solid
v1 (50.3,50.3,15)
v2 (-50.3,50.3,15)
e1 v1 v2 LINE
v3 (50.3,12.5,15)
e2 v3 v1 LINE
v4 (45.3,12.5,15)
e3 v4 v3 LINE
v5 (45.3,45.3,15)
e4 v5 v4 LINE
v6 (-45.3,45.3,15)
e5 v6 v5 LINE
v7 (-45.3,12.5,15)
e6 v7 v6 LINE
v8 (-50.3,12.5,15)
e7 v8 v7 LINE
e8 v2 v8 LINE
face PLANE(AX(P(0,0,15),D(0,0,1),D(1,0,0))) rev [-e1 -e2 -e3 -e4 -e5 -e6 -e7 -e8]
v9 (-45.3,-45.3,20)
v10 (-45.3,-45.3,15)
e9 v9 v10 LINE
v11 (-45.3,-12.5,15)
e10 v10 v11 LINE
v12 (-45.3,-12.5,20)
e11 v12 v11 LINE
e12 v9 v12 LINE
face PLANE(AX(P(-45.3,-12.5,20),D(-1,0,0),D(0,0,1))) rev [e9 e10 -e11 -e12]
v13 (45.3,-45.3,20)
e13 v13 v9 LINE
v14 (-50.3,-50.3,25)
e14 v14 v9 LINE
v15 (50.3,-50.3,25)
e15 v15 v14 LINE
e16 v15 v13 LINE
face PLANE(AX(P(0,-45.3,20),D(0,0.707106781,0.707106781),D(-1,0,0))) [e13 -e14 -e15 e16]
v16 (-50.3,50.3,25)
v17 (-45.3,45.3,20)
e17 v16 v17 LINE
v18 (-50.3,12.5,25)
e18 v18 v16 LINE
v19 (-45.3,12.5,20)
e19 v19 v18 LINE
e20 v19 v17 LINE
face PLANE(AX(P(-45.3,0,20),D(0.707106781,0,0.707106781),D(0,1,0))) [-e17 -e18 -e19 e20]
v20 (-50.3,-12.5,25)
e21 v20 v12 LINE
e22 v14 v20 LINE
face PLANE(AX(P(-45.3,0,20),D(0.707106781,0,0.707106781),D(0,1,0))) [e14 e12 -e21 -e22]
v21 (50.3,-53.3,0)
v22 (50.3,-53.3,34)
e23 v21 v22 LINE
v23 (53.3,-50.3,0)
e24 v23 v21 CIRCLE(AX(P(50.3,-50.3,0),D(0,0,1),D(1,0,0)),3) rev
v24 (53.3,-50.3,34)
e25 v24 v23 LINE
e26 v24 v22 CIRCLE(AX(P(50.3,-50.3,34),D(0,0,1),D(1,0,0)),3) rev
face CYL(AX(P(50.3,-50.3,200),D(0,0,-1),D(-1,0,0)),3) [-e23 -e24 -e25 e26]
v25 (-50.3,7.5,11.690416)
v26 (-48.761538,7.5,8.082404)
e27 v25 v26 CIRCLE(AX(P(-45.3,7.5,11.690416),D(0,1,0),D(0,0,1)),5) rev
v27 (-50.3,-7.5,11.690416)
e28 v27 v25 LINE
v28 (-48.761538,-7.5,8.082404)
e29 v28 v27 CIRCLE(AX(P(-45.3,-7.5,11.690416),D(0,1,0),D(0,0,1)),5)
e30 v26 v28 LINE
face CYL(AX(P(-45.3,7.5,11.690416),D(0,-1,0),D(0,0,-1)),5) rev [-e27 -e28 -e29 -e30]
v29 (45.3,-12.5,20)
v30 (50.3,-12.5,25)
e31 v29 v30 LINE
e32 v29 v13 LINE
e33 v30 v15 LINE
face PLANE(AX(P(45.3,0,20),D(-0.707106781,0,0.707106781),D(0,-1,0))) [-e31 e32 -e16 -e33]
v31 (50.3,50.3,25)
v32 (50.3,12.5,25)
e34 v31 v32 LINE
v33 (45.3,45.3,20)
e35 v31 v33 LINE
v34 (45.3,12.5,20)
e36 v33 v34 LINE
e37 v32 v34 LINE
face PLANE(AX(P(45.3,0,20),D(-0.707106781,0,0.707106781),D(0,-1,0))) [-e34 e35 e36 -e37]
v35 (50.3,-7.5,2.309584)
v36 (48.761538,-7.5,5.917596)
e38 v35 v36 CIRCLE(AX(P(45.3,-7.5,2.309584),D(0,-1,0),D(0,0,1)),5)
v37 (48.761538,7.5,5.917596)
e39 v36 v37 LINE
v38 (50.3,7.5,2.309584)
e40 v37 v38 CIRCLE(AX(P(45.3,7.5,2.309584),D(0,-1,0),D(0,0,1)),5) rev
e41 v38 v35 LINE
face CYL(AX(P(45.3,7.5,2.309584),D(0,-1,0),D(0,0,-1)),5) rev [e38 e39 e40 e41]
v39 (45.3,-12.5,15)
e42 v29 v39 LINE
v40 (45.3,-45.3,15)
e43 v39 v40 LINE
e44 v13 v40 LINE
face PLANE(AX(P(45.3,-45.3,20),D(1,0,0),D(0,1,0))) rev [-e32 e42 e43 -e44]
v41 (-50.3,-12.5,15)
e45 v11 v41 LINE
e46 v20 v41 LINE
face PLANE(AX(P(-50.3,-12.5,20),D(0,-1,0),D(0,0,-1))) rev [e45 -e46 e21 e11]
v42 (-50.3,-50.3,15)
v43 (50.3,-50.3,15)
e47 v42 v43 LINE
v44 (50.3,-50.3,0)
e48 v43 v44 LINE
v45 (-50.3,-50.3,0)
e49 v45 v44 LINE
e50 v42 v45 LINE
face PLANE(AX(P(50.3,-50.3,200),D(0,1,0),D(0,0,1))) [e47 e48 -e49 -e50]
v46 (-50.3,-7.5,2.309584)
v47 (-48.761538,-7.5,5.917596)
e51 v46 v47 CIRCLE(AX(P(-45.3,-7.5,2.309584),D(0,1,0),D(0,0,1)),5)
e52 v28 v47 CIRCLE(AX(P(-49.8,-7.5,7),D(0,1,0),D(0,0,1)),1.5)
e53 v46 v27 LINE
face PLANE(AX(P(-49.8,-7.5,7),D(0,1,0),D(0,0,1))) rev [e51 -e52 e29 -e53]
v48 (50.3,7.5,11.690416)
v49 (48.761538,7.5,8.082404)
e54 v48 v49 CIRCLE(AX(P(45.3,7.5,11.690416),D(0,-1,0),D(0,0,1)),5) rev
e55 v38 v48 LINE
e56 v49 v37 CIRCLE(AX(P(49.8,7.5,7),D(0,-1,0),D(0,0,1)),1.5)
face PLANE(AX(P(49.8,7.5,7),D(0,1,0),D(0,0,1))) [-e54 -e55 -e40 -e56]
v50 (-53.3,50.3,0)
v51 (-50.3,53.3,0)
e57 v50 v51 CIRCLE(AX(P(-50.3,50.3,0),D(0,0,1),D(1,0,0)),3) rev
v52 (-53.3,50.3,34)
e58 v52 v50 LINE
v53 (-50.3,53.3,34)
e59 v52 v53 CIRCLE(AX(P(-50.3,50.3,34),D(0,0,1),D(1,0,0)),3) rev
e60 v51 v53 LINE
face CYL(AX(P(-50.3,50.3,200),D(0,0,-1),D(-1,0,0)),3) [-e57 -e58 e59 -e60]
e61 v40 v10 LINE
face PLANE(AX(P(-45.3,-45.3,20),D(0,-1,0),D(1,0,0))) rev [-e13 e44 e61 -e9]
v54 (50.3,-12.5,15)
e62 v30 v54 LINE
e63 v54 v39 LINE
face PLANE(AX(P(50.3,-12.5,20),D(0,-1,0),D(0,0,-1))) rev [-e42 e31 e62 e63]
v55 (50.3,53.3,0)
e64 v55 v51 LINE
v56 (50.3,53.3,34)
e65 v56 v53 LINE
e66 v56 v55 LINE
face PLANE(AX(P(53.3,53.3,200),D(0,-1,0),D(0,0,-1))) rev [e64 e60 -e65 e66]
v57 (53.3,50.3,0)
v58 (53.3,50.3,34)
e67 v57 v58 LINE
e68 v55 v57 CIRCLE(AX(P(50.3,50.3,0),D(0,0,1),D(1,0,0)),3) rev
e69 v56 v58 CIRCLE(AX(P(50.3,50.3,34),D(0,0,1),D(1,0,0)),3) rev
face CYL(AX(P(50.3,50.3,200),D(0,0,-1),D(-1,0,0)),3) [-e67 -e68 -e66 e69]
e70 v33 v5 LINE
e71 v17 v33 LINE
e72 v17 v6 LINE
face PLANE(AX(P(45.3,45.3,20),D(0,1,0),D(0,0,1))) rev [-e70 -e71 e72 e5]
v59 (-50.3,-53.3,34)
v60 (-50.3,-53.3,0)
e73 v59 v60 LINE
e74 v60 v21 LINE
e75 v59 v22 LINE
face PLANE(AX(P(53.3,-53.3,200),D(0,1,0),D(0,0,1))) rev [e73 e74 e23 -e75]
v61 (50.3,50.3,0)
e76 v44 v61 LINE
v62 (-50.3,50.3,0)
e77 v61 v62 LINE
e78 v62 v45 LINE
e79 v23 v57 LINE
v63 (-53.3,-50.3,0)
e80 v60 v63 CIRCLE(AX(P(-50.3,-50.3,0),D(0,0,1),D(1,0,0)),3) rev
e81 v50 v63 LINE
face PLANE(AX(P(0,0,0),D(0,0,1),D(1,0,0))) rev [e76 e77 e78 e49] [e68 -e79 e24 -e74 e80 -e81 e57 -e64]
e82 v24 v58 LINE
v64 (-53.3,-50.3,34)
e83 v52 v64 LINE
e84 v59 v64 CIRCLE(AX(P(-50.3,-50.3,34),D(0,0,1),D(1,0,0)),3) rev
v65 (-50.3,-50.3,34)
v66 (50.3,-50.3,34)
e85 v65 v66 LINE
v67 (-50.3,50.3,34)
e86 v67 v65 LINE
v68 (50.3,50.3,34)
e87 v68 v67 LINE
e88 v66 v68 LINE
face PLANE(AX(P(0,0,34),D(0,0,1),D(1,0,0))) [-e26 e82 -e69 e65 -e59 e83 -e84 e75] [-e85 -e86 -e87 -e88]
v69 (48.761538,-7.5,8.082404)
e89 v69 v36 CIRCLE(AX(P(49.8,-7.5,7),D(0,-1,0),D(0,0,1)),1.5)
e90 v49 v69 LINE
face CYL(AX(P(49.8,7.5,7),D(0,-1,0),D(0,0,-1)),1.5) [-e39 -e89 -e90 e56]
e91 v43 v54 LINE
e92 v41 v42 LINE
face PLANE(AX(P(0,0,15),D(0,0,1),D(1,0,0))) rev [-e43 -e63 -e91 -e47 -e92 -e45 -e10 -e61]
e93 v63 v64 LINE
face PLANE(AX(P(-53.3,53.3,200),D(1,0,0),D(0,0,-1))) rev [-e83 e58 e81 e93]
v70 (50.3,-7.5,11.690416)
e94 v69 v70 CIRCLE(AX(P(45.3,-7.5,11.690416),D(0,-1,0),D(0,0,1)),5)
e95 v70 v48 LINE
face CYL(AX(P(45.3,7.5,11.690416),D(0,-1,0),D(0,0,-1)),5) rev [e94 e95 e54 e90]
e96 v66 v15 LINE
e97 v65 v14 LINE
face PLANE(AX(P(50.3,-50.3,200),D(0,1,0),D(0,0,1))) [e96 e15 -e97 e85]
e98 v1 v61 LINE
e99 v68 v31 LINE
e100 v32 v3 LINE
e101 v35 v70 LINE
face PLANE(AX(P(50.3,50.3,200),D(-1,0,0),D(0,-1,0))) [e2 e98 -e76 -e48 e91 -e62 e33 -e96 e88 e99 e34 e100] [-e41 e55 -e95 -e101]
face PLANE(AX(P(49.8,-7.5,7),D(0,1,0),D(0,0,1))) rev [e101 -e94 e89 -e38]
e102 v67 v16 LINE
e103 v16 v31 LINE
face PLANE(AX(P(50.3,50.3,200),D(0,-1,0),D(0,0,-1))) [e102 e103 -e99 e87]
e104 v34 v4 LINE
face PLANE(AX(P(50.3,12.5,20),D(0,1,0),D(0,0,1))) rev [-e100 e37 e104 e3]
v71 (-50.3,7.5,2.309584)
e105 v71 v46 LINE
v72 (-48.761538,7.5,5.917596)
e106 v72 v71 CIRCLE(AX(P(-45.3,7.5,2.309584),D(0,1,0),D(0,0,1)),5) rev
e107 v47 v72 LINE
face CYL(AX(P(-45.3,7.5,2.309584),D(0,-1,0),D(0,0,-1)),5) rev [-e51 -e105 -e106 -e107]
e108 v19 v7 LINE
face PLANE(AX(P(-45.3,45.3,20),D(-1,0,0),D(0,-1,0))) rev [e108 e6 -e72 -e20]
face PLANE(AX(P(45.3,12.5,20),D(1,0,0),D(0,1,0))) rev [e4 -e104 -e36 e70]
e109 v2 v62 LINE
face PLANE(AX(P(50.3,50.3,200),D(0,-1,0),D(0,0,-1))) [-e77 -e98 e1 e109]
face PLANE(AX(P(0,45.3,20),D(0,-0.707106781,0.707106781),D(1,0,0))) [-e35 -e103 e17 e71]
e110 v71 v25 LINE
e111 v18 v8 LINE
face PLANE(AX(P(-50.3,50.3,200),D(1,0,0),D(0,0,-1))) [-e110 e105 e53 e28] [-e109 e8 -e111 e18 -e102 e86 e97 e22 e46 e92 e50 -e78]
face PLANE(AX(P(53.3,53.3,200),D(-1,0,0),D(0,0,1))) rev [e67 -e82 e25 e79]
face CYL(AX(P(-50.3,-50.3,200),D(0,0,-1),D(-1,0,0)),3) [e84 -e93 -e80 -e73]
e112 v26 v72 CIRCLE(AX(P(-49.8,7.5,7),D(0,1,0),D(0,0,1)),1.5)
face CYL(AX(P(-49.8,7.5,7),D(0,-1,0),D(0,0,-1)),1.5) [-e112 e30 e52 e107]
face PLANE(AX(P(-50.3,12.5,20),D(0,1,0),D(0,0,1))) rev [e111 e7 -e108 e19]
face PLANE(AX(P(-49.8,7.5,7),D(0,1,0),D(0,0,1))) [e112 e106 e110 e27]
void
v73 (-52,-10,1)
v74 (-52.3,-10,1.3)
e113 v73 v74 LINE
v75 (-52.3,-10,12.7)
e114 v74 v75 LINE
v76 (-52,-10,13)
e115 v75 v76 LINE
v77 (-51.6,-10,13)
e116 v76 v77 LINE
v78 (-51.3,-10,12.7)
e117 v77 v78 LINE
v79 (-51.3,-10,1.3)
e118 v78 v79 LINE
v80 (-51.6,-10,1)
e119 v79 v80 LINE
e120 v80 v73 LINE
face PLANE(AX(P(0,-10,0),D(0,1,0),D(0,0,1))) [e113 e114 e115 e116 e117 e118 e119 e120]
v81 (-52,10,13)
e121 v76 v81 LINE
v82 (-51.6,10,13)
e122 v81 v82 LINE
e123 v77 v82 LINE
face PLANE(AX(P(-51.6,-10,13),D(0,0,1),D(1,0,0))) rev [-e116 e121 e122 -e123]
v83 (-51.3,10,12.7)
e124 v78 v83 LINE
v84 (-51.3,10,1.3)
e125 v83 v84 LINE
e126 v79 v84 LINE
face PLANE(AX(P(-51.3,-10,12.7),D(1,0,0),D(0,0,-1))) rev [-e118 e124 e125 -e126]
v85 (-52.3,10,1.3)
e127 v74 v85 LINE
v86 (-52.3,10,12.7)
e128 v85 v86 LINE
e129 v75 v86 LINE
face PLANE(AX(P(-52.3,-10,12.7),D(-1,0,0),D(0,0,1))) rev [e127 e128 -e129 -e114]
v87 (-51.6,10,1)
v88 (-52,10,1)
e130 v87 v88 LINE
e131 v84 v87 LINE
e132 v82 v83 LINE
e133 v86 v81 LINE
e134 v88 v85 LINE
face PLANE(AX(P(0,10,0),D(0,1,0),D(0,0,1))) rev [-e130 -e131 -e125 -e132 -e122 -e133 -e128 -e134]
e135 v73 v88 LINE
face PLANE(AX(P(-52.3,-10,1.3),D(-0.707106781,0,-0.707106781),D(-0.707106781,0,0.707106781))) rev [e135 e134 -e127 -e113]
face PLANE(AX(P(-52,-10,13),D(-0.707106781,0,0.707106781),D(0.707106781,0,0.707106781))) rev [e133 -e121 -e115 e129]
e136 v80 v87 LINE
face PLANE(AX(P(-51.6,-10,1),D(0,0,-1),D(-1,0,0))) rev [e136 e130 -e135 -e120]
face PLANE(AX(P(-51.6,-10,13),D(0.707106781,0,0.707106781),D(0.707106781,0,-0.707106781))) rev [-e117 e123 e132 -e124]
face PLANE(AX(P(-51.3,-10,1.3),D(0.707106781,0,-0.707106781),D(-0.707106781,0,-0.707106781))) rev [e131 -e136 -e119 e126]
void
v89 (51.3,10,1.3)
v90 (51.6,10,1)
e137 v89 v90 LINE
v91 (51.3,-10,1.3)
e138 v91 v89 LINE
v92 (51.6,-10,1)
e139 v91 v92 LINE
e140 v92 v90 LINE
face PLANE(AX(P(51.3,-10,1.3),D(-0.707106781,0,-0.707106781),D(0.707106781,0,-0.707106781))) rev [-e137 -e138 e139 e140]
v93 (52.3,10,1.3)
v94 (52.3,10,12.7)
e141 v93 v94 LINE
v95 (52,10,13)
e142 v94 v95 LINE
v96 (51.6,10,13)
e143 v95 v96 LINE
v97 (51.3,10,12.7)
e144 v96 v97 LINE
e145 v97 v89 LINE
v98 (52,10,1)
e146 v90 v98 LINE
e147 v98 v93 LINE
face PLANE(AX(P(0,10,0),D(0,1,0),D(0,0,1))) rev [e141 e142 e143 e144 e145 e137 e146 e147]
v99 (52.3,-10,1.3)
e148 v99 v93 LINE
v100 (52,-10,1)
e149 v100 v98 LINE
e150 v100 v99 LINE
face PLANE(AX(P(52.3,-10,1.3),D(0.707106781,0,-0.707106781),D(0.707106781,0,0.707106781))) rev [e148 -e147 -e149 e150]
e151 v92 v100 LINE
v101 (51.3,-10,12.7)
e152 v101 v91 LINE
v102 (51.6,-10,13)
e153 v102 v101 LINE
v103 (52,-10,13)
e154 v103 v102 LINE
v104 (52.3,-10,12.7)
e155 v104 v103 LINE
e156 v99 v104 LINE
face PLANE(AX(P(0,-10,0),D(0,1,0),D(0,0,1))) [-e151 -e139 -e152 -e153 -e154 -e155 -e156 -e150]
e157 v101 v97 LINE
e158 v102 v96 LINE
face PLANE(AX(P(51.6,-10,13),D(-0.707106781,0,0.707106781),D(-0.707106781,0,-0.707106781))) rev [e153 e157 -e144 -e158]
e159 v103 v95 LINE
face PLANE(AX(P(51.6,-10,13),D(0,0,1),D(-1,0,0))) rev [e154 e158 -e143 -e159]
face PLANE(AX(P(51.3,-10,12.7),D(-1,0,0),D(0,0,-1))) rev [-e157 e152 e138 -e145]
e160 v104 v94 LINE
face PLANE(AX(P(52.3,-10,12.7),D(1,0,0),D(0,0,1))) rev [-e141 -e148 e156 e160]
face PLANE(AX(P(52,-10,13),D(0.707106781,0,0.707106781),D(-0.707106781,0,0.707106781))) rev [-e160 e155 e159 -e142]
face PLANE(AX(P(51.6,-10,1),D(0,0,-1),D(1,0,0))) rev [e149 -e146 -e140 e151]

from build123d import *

# Parameters (mm, degrees)
SKETCH1_W            = 106.6
SKETCH1_H            = 106.6
SKETCH1_W_2          = 100.6
SKETCH1_H_2          = 100.6
BOSS_EXTRUDE1_DEPTH  = 200
SKETCH2_W            = 75
SKETCH2_H            = 10
CUT_EXTRUDE1_DEPTH   = 214.732964233
CIRPATTERN1_COUNT    = 2
CIRPATTERN1_ANGLE    = 90
FILLET1_R            = 3
BOSS_EXTRUDE2_DEPTH  = 5
SKETCH4_R            = 1.5
BOSS_EXTRUDE3_DEPTH  = 7.5
CUT_EXTRUDE3_DEPTH   = 10
FILLET2_R            = 5
FILLET2_OF_MIRROR3_R = 5
CHAMFER1_SIZE        = 5
SKETCH7_W            = 168.98996808
SKETCH7_H            = 119.087176344
TEST_PIECE_DEPTH     = 166


with BuildPart() as part:
    # Sketch1 → Boss-Extrude1 (new body)
    with BuildSketch(Plane(origin=(0, 0, 0), x_dir=(0, 1, 0), z_dir=(0, 0, 1))):
        Rectangle(SKETCH1_W, SKETCH1_H)
        Rectangle(SKETCH1_W_2, SKETCH1_H_2, mode=Mode.SUBTRACT)
    extrude(amount=BOSS_EXTRUDE1_DEPTH)

    # Sketch2 → Cut-Extrude1 (cut, symmetric)
    with BuildSketch(Plane.YZ):
        with Locations((0, 187.5)):
            Rectangle(SKETCH2_W, SKETCH2_H)
        with Locations((0, 172.5)):
            Rectangle(SKETCH2_W, SKETCH2_H)
        with Locations((0, 157.5)):
            Rectangle(SKETCH2_W, SKETCH2_H)
    cut_extrude1 = extrude(amount=CUT_EXTRUDE1_DEPTH, both=True, mode=Mode.SUBTRACT)

    # CirPattern1: Cut-Extrude1 ×2 about axis
    cirpattern1_axis = Axis((0, 0, 210), (0, 0, -1))
    for i in range(1, CIRPATTERN1_COUNT):
        add(cut_extrude1.rotate(cirpattern1_axis, i * CIRPATTERN1_ANGLE / (CIRPATTERN1_COUNT - 1)), mode=Mode.SUBTRACT)

    # Fillet1
    fillet1_edges = [part.edges().sort_by_distance(p)[0] for p in [
        (-53.3, -53.3, 100),
        (-53.3, 53.3, 100),
        (53.3, 53.3, 100),
        (53.3, -53.3, 100),
    ]]
    fillet(fillet1_edges, radius=FILLET1_R)

    # Sketch3 → Boss-Extrude2 (add)
    with BuildSketch(Plane(origin=(0, 0, 15), x_dir=(0, 1, 0), z_dir=(0, 0, 1))):
        Polygon((-50.3, -50.3), (-12.5, -50.3), (-12.5, -45.3), (-45.3, -45.3), (-45.3, 45.3), (-12.5, 45.3), (-12.5, 50.3), (-50.3, 50.3), align=None)
        Polygon((50.3, -50.3), (50.3, 50.3), (12.5, 50.3), (12.5, 45.3), (45.3, 45.3), (45.3, -45.3), (12.5, -45.3), (12.5, -50.3), align=None)
    extrude(amount=BOSS_EXTRUDE2_DEPTH)

    # Sketch4 → Boss-Extrude3 (add, symmetric)
    with BuildSketch(Plane(origin=(0, 0, 0), x_dir=(-1, 0, 0), z_dir=(0, 1, 0))):
        with Locations((49.8, 7)):
            Circle(SKETCH4_R)
    boss_extrude3 = extrude(amount=BOSS_EXTRUDE3_DEPTH, both=True)

    # Sketch6 → Cut-Extrude3 (cut, symmetric)
    with BuildSketch(Plane(origin=(0, 0, 0), x_dir=(-1, 0, 0), z_dir=(0, 1, 0))):
        Polygon((51.6, 13), (52, 13), (52.3, 12.7), (52.3, 1.3), (52, 1), (51.6, 1), (51.3, 1.3), (51.3, 12.7), align=None)
    cut_extrude3 = extrude(amount=CUT_EXTRUDE3_DEPTH, both=True, mode=Mode.SUBTRACT)

    # Fillet2
    fillet2_edges = [part.edges().sort_by_distance(p)[0] for p in [
        (-50.3, 0, 5.585786438),
        (-50.3, 0, 8.414213562),
    ]]
    fillet(fillet2_edges, radius=FILLET2_R)

    # Mirror3: Boss-Extrude3, Cut-Extrude3 across plane
    add(boss_extrude3.mirror(Plane(origin=(0, 0, 0), x_dir=(0, 0, 1), z_dir=(1, 0, 0))))
    add(cut_extrude3.mirror(Plane(origin=(0, 0, 0), x_dir=(0, 0, 1), z_dir=(1, 0, 0))), mode=Mode.SUBTRACT)

    # Fillet2 of Mirror3
    fillet2_of_mirror3_edges = [part.edges().sort_by_distance(p)[0] for p in [
        (50.3, 0, 5.585786438),
        (50.3, 0, 8.414213562),
    ]]
    fillet(fillet2_of_mirror3_edges, radius=FILLET2_OF_MIRROR3_R)

    # Chamfer1
    chamfer1_edges = [part.edges().sort_by_distance(p)[0] for p in [
        (50.3, 31.4, 20),
        (0, 50.3, 20),
        (-50.3, 31.4, 20),
        (-50.3, -31.4, 20),
        (0, -50.3, 20),
        (50.3, -31.4, 20),
    ]]
    chamfer(chamfer1_edges, length=CHAMFER1_SIZE - 0.0001)  # a hair under: the kernel refuses the full size

    # Sketch7 → test_piece (cut)
    with BuildSketch(Plane.XY.offset(200)):
        Rectangle(SKETCH7_W, SKETCH7_H)
    extrude(amount=-TEST_PIECE_DEPTH, mode=Mode.SUBTRACT)


solid = part.part
